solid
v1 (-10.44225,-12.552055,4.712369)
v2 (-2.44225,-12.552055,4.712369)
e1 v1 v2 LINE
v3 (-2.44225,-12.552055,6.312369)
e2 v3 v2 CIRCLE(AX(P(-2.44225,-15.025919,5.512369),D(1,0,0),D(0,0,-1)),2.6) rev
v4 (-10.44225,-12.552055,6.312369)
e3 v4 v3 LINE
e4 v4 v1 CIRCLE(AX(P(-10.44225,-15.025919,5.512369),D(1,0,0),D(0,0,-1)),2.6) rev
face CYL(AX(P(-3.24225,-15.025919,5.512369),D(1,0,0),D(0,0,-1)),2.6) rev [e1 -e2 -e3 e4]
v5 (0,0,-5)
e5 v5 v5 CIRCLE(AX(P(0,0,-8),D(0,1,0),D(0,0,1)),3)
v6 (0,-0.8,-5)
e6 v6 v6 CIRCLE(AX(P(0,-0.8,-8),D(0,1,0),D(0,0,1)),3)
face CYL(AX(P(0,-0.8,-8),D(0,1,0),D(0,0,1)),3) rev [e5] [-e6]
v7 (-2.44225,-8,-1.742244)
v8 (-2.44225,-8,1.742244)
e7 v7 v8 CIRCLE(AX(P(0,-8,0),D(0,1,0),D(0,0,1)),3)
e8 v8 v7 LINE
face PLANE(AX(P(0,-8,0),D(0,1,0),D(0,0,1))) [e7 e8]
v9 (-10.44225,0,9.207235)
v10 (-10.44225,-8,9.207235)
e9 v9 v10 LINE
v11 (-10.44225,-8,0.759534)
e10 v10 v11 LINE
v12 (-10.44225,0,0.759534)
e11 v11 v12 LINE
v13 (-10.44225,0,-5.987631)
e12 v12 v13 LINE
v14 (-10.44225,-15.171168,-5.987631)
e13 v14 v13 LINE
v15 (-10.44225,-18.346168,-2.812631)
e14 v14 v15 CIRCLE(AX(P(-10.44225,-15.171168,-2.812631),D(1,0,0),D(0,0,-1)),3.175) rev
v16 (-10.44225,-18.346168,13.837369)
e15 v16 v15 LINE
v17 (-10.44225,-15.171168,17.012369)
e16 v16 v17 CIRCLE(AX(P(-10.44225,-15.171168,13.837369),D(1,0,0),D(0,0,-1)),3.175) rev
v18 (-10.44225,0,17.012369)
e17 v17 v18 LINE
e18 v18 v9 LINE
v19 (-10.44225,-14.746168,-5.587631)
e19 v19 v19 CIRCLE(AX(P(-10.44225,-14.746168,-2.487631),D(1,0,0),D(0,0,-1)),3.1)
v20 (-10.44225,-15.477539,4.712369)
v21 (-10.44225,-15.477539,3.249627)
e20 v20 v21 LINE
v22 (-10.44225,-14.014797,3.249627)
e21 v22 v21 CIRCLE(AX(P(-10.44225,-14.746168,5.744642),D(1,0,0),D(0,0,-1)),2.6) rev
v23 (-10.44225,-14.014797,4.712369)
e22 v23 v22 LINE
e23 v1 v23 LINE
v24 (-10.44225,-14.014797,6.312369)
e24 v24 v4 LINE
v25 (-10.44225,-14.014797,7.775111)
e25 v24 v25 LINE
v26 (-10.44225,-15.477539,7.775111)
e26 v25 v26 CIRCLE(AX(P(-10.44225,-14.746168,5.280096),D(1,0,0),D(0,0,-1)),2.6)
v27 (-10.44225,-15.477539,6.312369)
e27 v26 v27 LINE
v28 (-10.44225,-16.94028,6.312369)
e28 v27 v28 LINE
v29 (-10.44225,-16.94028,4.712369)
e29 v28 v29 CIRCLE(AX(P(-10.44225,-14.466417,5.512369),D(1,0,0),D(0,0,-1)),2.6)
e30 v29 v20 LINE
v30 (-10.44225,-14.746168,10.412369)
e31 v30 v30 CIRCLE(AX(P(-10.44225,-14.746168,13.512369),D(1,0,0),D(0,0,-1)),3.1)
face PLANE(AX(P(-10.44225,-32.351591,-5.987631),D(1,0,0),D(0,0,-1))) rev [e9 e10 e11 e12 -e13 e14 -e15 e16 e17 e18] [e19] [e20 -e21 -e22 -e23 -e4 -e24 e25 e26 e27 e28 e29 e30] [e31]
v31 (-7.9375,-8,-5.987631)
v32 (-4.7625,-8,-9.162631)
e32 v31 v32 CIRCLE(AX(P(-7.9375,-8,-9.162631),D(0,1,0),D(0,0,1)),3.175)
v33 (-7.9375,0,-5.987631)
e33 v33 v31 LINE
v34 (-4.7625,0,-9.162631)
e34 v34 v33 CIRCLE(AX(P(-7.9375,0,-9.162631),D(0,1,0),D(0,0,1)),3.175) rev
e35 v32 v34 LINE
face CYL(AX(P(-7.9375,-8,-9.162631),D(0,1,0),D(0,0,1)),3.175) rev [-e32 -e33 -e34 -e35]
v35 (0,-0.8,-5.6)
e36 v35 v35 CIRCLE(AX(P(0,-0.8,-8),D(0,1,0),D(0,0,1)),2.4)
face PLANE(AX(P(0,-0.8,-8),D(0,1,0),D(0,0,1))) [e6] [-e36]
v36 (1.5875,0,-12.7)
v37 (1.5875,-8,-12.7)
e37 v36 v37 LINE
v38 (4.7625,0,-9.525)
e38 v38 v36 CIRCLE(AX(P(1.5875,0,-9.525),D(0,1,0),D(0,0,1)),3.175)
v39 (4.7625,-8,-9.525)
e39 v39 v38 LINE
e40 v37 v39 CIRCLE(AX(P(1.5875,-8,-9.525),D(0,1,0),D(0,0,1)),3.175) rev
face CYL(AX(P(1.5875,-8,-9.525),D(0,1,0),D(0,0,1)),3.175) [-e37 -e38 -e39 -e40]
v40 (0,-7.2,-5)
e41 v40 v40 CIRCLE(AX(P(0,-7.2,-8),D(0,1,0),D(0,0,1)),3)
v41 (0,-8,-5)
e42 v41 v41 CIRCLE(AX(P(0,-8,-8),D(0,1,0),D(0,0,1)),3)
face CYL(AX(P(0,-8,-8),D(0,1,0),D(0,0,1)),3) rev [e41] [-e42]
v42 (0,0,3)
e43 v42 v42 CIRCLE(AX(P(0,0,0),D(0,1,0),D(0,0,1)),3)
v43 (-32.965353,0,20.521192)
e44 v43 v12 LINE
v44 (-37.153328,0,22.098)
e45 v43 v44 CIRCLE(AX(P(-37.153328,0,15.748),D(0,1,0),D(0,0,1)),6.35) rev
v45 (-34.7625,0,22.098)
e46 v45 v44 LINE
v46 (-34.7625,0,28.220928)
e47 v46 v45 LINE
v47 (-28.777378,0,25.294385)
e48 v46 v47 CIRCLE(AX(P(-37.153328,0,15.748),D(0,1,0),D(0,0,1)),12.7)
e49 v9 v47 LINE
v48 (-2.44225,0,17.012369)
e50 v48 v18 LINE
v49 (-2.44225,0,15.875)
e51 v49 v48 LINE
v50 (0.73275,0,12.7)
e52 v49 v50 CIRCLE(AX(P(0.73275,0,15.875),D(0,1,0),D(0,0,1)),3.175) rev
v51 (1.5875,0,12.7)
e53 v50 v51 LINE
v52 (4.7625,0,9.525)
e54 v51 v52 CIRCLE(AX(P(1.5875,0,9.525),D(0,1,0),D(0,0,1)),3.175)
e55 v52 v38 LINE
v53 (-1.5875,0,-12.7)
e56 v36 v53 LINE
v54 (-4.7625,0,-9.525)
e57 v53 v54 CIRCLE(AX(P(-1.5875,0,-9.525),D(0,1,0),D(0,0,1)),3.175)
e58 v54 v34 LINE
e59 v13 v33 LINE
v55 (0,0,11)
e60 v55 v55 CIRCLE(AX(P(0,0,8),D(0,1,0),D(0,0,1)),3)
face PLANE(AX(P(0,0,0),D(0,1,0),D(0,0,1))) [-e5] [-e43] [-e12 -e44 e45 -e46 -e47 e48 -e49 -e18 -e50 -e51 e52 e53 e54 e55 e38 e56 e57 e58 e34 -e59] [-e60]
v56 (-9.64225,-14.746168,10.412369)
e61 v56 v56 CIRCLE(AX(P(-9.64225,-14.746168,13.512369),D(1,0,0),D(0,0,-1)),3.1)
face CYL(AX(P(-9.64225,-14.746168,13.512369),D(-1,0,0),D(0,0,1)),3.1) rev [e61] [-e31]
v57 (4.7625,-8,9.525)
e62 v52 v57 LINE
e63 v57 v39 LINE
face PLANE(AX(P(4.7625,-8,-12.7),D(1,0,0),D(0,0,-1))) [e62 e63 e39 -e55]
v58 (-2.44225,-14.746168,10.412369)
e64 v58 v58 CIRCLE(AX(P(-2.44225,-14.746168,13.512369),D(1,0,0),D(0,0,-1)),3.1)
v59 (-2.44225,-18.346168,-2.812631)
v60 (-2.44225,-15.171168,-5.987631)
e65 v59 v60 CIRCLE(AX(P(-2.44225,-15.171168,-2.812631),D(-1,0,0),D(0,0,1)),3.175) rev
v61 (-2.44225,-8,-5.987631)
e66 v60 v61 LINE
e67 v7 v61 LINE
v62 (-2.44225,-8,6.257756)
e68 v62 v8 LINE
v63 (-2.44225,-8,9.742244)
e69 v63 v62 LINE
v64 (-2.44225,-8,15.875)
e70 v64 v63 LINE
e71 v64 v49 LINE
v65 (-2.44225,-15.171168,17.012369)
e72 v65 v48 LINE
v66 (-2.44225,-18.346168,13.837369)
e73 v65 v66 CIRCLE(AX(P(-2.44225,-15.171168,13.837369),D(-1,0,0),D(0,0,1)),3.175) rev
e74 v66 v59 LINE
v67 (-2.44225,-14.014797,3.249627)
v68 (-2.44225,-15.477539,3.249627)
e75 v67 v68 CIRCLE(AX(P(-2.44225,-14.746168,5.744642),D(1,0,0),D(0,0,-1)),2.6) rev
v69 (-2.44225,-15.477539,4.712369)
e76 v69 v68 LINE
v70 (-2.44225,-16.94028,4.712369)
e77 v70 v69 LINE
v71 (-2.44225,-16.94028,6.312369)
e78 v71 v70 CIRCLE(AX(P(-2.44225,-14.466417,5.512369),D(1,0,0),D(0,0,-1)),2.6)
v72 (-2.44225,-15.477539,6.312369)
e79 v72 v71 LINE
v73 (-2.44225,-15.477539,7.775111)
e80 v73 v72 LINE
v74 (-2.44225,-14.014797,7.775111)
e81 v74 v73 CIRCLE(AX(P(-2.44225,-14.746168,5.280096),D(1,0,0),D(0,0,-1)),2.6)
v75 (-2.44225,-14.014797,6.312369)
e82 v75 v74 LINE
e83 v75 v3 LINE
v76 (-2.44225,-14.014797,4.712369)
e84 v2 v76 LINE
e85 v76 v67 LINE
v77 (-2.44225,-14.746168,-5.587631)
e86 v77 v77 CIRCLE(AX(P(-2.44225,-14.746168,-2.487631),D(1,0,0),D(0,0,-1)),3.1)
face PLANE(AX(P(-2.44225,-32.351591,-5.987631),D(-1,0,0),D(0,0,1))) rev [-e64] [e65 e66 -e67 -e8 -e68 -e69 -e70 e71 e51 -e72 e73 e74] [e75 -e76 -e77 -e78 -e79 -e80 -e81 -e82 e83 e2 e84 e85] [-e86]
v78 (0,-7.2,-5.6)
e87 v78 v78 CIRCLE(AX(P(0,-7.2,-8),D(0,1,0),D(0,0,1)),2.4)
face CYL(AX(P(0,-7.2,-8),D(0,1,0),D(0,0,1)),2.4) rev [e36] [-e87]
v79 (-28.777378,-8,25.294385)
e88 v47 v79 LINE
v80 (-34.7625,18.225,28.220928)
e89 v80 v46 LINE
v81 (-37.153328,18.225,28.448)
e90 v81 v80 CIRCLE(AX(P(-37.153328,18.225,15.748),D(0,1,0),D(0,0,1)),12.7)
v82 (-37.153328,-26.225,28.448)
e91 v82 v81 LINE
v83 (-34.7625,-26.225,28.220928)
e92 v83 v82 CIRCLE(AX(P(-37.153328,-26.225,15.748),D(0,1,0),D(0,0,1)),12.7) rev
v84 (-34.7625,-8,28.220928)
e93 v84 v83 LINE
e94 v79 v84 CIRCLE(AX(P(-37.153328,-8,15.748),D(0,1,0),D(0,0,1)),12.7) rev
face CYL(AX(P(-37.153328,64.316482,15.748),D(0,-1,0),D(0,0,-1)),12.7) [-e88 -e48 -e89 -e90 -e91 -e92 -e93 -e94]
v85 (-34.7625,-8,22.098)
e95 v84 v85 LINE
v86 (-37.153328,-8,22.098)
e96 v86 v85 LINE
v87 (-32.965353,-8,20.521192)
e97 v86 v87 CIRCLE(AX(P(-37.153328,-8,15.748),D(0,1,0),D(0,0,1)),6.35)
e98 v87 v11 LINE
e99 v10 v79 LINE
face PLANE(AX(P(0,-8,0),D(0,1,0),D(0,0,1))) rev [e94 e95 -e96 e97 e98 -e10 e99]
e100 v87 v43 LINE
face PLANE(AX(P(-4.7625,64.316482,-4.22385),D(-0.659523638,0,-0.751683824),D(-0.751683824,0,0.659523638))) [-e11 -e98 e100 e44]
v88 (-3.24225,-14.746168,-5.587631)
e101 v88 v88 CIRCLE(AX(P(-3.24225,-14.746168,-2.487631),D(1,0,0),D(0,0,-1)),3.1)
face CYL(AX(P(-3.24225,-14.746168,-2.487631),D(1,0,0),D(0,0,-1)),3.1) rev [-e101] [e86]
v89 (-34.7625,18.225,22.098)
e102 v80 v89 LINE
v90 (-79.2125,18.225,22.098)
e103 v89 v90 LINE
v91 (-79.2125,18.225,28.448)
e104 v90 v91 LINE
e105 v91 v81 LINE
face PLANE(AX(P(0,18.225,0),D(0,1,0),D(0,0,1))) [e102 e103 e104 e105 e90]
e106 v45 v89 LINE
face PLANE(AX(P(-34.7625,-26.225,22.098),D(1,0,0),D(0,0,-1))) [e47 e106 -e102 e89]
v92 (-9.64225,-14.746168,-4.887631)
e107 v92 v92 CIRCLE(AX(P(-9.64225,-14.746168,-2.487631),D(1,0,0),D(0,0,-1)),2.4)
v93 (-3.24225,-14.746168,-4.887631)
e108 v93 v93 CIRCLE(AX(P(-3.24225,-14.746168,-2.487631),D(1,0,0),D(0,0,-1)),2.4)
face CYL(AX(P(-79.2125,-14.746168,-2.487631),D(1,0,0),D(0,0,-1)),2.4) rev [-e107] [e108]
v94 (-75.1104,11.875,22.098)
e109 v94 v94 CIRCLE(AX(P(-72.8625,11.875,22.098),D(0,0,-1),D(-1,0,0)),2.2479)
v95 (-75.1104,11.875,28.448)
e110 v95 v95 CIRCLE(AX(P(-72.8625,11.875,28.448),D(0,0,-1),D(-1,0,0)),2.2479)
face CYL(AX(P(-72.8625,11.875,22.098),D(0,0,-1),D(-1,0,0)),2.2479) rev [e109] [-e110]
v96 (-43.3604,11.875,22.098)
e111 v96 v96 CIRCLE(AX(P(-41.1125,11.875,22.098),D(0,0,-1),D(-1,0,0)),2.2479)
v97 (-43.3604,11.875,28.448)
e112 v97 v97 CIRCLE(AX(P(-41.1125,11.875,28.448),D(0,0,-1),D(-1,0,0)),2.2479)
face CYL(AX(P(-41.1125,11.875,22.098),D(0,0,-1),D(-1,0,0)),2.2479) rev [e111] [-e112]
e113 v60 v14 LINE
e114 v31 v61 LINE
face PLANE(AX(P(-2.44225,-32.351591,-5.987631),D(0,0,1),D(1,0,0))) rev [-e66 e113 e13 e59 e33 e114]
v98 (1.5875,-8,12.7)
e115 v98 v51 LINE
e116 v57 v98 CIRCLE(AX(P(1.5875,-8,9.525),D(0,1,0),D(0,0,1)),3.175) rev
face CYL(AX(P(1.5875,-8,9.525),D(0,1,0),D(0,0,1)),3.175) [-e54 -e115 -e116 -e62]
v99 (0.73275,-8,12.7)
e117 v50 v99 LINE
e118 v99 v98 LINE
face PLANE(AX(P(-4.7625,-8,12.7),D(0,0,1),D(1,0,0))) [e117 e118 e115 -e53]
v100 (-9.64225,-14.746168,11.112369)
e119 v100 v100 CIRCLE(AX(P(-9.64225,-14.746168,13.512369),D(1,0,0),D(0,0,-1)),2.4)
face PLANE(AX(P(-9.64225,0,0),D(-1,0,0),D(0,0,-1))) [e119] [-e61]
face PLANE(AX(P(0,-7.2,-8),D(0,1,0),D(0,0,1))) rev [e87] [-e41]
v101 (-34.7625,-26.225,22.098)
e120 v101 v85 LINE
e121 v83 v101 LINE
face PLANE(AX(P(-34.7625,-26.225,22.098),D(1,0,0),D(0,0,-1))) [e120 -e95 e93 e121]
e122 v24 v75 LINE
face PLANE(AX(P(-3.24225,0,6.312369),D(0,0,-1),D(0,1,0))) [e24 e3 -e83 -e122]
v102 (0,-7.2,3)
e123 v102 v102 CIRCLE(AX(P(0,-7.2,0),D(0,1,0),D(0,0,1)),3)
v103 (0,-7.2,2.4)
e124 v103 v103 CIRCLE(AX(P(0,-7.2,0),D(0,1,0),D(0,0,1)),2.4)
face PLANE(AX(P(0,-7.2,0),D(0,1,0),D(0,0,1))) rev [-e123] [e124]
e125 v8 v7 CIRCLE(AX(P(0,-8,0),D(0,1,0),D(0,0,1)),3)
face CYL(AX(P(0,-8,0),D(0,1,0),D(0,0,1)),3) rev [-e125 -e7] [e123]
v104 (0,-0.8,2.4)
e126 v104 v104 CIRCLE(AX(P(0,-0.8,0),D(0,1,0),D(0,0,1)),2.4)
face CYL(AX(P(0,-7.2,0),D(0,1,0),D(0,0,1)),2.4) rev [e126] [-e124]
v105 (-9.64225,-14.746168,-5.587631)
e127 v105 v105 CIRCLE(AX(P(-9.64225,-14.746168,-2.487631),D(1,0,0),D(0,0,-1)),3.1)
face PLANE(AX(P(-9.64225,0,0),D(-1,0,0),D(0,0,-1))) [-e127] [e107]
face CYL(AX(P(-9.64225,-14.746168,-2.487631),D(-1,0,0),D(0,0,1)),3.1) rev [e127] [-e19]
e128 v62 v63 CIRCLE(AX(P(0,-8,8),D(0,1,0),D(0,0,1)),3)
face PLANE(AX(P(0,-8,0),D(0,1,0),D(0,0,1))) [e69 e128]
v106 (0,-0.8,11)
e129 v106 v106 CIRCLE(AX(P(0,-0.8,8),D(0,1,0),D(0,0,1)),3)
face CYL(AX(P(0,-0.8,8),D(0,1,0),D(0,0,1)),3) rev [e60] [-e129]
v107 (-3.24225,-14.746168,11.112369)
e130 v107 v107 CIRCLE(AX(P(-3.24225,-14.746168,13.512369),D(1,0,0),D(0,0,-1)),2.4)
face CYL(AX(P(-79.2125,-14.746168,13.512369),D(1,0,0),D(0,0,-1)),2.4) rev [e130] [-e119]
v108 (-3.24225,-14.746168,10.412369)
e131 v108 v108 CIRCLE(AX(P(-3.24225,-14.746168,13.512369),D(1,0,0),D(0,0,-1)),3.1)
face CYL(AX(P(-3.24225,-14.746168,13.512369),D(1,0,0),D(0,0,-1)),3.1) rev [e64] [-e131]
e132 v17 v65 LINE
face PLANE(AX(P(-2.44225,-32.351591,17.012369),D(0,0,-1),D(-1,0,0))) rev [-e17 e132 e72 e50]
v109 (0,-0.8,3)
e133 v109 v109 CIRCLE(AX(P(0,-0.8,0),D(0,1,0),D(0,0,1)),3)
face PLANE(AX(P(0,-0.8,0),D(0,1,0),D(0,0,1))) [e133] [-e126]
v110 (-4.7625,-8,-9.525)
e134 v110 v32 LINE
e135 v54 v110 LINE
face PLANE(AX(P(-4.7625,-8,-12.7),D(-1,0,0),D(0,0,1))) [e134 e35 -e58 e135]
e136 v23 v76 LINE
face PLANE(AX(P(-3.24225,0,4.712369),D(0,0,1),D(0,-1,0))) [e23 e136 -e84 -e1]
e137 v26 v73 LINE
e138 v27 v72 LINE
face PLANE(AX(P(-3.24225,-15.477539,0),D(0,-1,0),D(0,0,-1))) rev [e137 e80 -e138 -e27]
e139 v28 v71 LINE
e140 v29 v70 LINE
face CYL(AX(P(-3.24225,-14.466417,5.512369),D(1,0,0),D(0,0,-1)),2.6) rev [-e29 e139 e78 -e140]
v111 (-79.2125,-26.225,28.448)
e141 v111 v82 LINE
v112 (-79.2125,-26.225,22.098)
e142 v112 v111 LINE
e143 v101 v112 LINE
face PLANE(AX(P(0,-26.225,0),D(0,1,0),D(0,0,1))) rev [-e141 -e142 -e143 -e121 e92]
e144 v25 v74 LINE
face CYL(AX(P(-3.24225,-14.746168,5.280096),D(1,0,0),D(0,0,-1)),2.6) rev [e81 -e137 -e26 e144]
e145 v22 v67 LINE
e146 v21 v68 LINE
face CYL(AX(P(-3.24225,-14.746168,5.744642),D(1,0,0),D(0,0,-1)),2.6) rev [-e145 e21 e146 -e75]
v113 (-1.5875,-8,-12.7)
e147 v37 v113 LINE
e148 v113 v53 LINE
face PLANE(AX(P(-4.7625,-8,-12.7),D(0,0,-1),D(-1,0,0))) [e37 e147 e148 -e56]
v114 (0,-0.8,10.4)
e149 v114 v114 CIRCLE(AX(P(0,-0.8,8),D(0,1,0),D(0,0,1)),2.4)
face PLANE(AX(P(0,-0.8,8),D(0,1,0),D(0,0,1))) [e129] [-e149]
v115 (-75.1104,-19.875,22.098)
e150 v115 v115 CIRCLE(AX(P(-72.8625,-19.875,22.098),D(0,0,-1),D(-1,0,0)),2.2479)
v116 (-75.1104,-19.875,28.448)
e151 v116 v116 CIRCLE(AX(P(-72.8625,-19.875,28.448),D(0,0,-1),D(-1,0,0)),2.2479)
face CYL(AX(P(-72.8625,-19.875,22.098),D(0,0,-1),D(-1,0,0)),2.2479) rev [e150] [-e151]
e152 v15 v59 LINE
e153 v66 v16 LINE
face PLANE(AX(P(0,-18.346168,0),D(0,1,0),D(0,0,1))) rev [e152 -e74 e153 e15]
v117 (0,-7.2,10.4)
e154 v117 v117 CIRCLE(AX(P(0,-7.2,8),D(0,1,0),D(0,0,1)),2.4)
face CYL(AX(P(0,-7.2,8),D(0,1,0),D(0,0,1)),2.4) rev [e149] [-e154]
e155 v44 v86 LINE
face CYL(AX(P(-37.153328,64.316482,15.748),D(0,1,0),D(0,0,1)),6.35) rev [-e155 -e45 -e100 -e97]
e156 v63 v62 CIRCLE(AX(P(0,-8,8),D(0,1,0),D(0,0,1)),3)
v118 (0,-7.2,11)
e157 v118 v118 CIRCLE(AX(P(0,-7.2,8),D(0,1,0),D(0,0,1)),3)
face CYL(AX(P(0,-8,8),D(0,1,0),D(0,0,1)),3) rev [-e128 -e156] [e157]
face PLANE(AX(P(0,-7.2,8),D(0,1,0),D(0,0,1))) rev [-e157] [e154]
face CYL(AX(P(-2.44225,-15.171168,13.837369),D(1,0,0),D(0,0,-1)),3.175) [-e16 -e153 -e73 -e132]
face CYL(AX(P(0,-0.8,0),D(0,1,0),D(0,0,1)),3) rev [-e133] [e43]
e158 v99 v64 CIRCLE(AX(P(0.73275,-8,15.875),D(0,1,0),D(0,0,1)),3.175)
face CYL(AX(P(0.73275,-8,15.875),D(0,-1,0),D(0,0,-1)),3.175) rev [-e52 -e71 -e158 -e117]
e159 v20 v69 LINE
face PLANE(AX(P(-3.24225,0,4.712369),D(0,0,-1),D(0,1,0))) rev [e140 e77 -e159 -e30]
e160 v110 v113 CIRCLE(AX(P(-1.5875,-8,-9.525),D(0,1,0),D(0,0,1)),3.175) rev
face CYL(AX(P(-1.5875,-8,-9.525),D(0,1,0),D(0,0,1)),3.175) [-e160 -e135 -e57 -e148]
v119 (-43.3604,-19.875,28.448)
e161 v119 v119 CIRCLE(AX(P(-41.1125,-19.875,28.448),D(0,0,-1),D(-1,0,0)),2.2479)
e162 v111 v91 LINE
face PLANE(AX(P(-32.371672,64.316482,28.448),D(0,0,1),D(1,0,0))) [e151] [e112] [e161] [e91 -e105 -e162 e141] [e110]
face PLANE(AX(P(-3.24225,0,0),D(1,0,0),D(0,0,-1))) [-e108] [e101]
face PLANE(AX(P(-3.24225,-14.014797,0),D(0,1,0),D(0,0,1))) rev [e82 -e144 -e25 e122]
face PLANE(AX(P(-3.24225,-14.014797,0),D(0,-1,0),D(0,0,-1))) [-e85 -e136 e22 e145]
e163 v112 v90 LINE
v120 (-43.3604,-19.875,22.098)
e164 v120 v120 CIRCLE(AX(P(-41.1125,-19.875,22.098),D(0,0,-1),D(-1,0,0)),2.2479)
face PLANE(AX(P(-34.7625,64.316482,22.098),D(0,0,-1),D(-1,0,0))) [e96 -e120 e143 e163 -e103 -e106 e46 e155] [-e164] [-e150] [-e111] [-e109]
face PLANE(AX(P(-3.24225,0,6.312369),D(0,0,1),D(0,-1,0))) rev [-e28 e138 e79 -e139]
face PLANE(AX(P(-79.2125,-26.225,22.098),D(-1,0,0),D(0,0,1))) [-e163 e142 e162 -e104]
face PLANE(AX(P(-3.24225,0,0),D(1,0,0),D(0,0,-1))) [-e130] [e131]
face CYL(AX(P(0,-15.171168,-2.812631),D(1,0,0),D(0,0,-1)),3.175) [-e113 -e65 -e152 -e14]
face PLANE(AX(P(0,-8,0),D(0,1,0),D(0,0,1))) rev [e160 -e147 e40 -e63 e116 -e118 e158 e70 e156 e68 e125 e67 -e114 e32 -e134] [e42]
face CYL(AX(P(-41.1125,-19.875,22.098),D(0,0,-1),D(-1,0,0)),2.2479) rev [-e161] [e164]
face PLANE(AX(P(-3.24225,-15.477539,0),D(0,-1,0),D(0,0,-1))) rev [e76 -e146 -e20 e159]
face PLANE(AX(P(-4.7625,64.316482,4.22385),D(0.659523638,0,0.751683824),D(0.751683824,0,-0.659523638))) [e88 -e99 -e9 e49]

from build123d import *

# Parameters (mm, degrees)
SKETCH6_W                = 9.525
SKETCH6_H                = 25.4
BOSS_EXTRUDE1_DEPTH      = 8
SKETCH16_W               = 8
SKETCH16_H               = 23
BOSS_EXTRUDE6_DEPTH      = 8
SKETCH7_R                = 3
SKETCH7_R_2              = 2.4
CUT_EXTRUDE1_DEPTH       = 0.8
SKETCH7_3_R              = 2.4
CUT_EXTRUDE2_DEPTH       = 7.2
SKETCH9_R                = 3
CUT_EXTRUDE4_DEPTH       = 0.8
BOSS_EXTRUDE3_DEPTH      = 8
FILLET1_R                = 3.175
FILLET3_R                = 3.175
BOSS_EXTRUDE7_DEPTH      = 18.225
BOSS_EXTRUDE7_DEPTH_BACK = 26.225
SKETCH18_W               = 44.45
SKETCH18_H               = 6.35
FILLET6_R                = 12.7
FILLET7_R                = 6.35
SKETCH11_W               = 8
SKETCH11_H               = 23
BOSS_EXTRUDE4_DEPTH      = 6.746167864
SKETCH14_W               = 8
SKETCH14_H               = 23
BOSS_EXTRUDE5_DEPTH      = 3.6
SKETCH13_R               = 3.1
SKETCH13_R_2             = 2.4
CUT_EXTRUDE5_DEPTH       = 0.8
CUT_EXTRUDE6_START       = -8
CUT_EXTRUDE6_OUTLINE_R   = 2.4
CUT_EXTRUDE6_DEPTH       = 8
F_8_CLEARANCE_HOLE1_D    = 4.4958
FILLET8_R                = 3.175


# Read off the part's stored shape, not the designer's step: Cut-Extrude6
with BuildPart() as part:
    # Sketch6 → Boss-Extrude1 (new body)
    with BuildSketch(Plane(origin=(0, 0, 0), x_dir=(1, 0, 0), z_dir=(0, 1, 0))):
        Rectangle(SKETCH6_W, SKETCH6_H)
    extrude(amount=-BOSS_EXTRUDE1_DEPTH)

    # Sketch16 → Boss-Extrude6 (add)
    with BuildSketch(Plane.XZ):
        with Locations((-6.442250006, 5.512369214)):
            Rectangle(SKETCH16_W, SKETCH16_H)
    extrude(amount=BOSS_EXTRUDE6_DEPTH)

    # Sketch7 → Cut-Extrude1 (cut)
    # profile 1 of 3: a face of its own
    with BuildSketch(Plane(origin=(0, 0, 0), x_dir=(1, 0, 0), z_dir=(0, 1, 0))):
        with Locations(Location((0, 8, 0), (0, 0, 270))):
            Circle(SKETCH7_R)
        with Locations(Location((0, 8, 0), (0, 0, 270))):
            Circle(SKETCH7_R_2, mode=Mode.SUBTRACT)
    # profile 2 of 3: a face of its own
    with BuildSketch(Plane(origin=(0, 0, 0), x_dir=(1, 0, 0), z_dir=(0, 1, 0))):
        with Locations(Location((0, 0, 0), (0, 0, 270))):
            Circle(SKETCH7_R)
        with Locations(Location((0, 0, 0), (0, 0, 270))):
            Circle(SKETCH7_R_2, mode=Mode.SUBTRACT)
    # profile 3 of 3: a face of its own
    with BuildSketch(Plane(origin=(0, 0, 0), x_dir=(1, 0, 0), z_dir=(0, 1, 0))):
        with Locations(Location((0, -8, 0), (0, 0, 270))):
            Circle(SKETCH7_R)
        with Locations(Location((0, -8, 0), (0, 0, 270))):
            Circle(SKETCH7_R_2, mode=Mode.SUBTRACT)
    extrude(amount=-CUT_EXTRUDE1_DEPTH, mode=Mode.SUBTRACT)

    # Sketch7<3> → Cut-Extrude2 (cut)
    with BuildSketch(Plane(origin=(0, 0, 0), x_dir=(1, 0, 0), z_dir=(0, 1, 0))):
        with Locations(Location((0, 8, 0), (0, 0, 270))):
            Circle(SKETCH7_3_R)
        with Locations(Location((0, 0, 0), (0, 0, 270))):
            Circle(SKETCH7_3_R)
        with Locations(Location((0, -8, 0), (0, 0, 270))):
            Circle(SKETCH7_3_R)
    extrude(amount=-CUT_EXTRUDE2_DEPTH, mode=Mode.SUBTRACT)

    # Sketch9 → Cut-Extrude4 (cut)
    with BuildSketch(Plane(origin=(0, -7.2, -7.2), x_dir=(1, 0, 0), z_dir=(0, 1, 0))):
        with Locations(Location((0, 0.8, 0), (0, 0, 270))):
            Circle(SKETCH9_R)
        with Locations(Location((0, -7.2, 0), (0, 0, 270))):
            Circle(SKETCH9_R)
        with Locations(Location((0, -15.2, 0), (0, 0, 270))):
            Circle(SKETCH9_R)
    extrude(amount=-CUT_EXTRUDE4_DEPTH, mode=Mode.SUBTRACT)

    # Sketch10 → Boss-Extrude3 (add)
    with BuildSketch(Plane(origin=(0, -8, 0), x_dir=(-1, 0, 0), z_dir=(0, -1, 0))):
        Polygon((4.7625, 4.223850374), (34.7625, -22.098), (60.1625, -22.098), (60.1625, -28.448), (32.37167179, -28.448), (4.7625, -4.223850374), align=None)
    extrude(amount=-BOSS_EXTRUDE3_DEPTH)

    # Fillet1
    fillet1_edges = [part.edges().sort_by_distance(p)[0] for p in [
        (-2.442250006, -4, 12.7),
        (-4.7625, -4, -5.987630786),
    ]]
    fillet(fillet1_edges, radius=FILLET1_R)

    # Fillet3
    fillet3_edges = [part.edges().sort_by_distance(p)[0] for p in [
        (4.7625, -4, 12.7),
        (-4.7625, -4, -12.7),
        (4.7625, -4, -12.7),
    ]]
    fillet(fillet3_edges, radius=FILLET3_R)

    # Sketch18 → Boss-Extrude7 (add, two sides: drawn at the far end of the back side and taken through both)
    with BuildSketch(Plane(origin=(0, 0, 0), x_dir=(1, 0, 0), z_dir=(0, 1, 0)).offset(-BOSS_EXTRUDE7_DEPTH_BACK)):
        with Locations((-56.9875, -25.273)):
            Rectangle(SKETCH18_W, SKETCH18_H)
    extrude(amount=BOSS_EXTRUDE7_DEPTH + BOSS_EXTRUDE7_DEPTH_BACK)

    # Fillet6
    fillet6_edges = [part.edges().sort_by_distance(p)[0] for p in [
        (-32.37167179, -4, 28.448),
    ]]
    fillet(fillet6_edges, radius=FILLET6_R)

    # Fillet7
    fillet7_edges = [part.edges().sort_by_distance(p)[0] for p in [
        (-34.7625, -4, 22.098),
    ]]
    fillet(fillet7_edges, radius=FILLET7_R)

    # Sketch11 → Boss-Extrude4 (add)
    with BuildSketch(Plane(origin=(0, -8, 0), x_dir=(-1, 0, 0), z_dir=(0, -1, 0))):
        with Locations((6.44225, -5.512369144)):
            Rectangle(SKETCH11_W, SKETCH11_H)
    extrude(amount=BOSS_EXTRUDE4_DEPTH)

    # Sketch14 → Boss-Extrude5 (add)
    with BuildSketch(Plane(origin=(0, -14.746167864, 0), x_dir=(-1, 0, 0), z_dir=(0, -1, 0))):
        with Locations((6.44225, -5.512369144)):
            Rectangle(SKETCH14_W, SKETCH14_H)
    extrude(amount=BOSS_EXTRUDE5_DEPTH)

    # Sketch13 → Cut-Extrude5 (cut)
    # profile 1 of 3: a face of its own
    with BuildSketch(Plane(origin=(-2.442250006, 0, 0), x_dir=(0, 0, -1), z_dir=(1, 0, 0))):
        with Locations((-13.512369144, -14.746167864)):
            Circle(SKETCH13_R)
        with Locations((-13.512369144, -14.746167864)):
            Circle(SKETCH13_R_2, mode=Mode.SUBTRACT)
    # profile 2 of 3: a face of its own
    with BuildSketch(Plane(origin=(-2.442250006, 0, 0), x_dir=(0, 0, -1), z_dir=(1, 0, 0))):
        with Locations((2.487630856, -14.746167864)):
            Circle(SKETCH13_R)
        with Locations((2.487630856, -14.746167864)):
            Circle(SKETCH13_R_2, mode=Mode.SUBTRACT)
    # profile 3 of 3: a face of its own
    with BuildSketch(Plane(origin=(-2.442250006, 0, 0), x_dir=(0, 0, -1), z_dir=(1, 0, 0))):
        with BuildLine():
            Line((-6.312369144, -14.014797014), (-6.312369144, -12.552055314))
            ThreePointArc((-6.312369144, -12.552055314), (-5.512369144, -12.425918689), (-4.712369144, -12.552055314))
            Line((-4.712369144, -12.552055314), (-4.712369144, -14.014797014))
            Line((-4.712369144, -14.014797014), (-3.249627444, -14.014797014))
            ThreePointArc((-3.249627444, -14.014797014), (-3.144641809, -14.746167864), (-3.249627444, -15.477538714))
            Line((-3.249627444, -15.477538714), (-4.712369144, -15.477538714))
            Line((-4.712369144, -15.477538714), (-4.712369144, -16.940280414))
            ThreePointArc((-4.712369144, -16.940280414), (-5.512369144, -17.066417039), (-6.312369144, -16.940280414))
            Line((-6.312369144, -16.940280414), (-6.312369144, -15.477538714))
            Line((-6.312369144, -15.477538714), (-7.775110844, -15.477538714))
            ThreePointArc((-7.775110844, -15.477538714), (-7.880096479, -14.746167864), (-7.775110844, -14.014797014))
            Line((-7.775110844, -14.014797014), (-6.312369144, -14.014797014))
        make_face()
    cut_extrude5 = extrude(amount=-CUT_EXTRUDE5_DEPTH, mode=Mode.SUBTRACT)

    # Cut-Extrude6 outline → Cut-Extrude6 (cut)
    with BuildSketch(Plane(origin=(-2.442250006, 0, 0), x_dir=(0, 0, -1), z_dir=(1, 0, 0)).offset(CUT_EXTRUDE6_START)):
        with BuildLine():
            Line((-4.712369144, -15.477538714), (-3.249627444, -15.477538714))
            ThreePointArc((-3.249627444, -15.477538714), (-3.144641809, -14.746167864), (-3.249627444, -14.014797014))
            Line((-3.249627444, -14.014797014), (-4.712369144, -14.014797014))
            Line((-4.712369144, -14.014797014), (-4.712369144, -12.552055314))
            ThreePointArc((-4.712369144, -12.552055314), (-5.512369144, -12.425918689), (-6.312369144, -12.552055314))
            Line((-6.312369144, -12.552055314), (-6.312369144, -14.014797014))
            Line((-6.312369144, -14.014797014), (-7.775110844, -14.014797014))
            ThreePointArc((-7.775110844, -14.014797014), (-7.880096479, -14.746167864), (-7.775110844, -15.477538714))
            Line((-7.775110844, -15.477538714), (-6.312369144, -15.477538714))
            Line((-6.312369144, -15.477538714), (-6.312369144, -16.940280414))
            ThreePointArc((-6.312369144, -16.940280414), (-5.512369144, -17.066417039), (-4.712369144, -16.940280414))
            Line((-4.712369144, -16.940280414), (-4.712369144, -15.477538714))
        make_face()
        with Locations((-13.512369144, -14.746167864)):
            Circle(CUT_EXTRUDE6_OUTLINE_R)
        with Locations((2.487630856, -14.746167864)):
            Circle(CUT_EXTRUDE6_OUTLINE_R)
    extrude(amount=CUT_EXTRUDE6_DEPTH, mode=Mode.SUBTRACT)

    # Mirror1: Cut-Extrude5 across plane
    add(cut_extrude5.mirror(Plane(origin=(-6.442250006, 0, 0), x_dir=(0, 0, 1), z_dir=(1, 0, 0))), mode=Mode.SUBTRACT)

    # #8 Clearance Hole1 (through all)
    with Locations(Plane(origin=(0, 0, 22.098), x_dir=(-1, 0, 0), z_dir=(0, 0, -1))):
        with Locations((72.8625, 11.875), (41.1125, 11.875), (41.1125, -19.875), (72.8625, -19.875)):
            Hole(F_8_CLEARANCE_HOLE1_D / 2)

    # Fillet8
    fillet8_edges = [part.edges().sort_by_distance(p)[0] for p in [
        (-6.44225, -18.346167864, 17.012369144),
        (-6.44225, -18.346167864, -5.987630856),
    ]]
    fillet(fillet8_edges, radius=FILLET8_R)


solid = part.part
